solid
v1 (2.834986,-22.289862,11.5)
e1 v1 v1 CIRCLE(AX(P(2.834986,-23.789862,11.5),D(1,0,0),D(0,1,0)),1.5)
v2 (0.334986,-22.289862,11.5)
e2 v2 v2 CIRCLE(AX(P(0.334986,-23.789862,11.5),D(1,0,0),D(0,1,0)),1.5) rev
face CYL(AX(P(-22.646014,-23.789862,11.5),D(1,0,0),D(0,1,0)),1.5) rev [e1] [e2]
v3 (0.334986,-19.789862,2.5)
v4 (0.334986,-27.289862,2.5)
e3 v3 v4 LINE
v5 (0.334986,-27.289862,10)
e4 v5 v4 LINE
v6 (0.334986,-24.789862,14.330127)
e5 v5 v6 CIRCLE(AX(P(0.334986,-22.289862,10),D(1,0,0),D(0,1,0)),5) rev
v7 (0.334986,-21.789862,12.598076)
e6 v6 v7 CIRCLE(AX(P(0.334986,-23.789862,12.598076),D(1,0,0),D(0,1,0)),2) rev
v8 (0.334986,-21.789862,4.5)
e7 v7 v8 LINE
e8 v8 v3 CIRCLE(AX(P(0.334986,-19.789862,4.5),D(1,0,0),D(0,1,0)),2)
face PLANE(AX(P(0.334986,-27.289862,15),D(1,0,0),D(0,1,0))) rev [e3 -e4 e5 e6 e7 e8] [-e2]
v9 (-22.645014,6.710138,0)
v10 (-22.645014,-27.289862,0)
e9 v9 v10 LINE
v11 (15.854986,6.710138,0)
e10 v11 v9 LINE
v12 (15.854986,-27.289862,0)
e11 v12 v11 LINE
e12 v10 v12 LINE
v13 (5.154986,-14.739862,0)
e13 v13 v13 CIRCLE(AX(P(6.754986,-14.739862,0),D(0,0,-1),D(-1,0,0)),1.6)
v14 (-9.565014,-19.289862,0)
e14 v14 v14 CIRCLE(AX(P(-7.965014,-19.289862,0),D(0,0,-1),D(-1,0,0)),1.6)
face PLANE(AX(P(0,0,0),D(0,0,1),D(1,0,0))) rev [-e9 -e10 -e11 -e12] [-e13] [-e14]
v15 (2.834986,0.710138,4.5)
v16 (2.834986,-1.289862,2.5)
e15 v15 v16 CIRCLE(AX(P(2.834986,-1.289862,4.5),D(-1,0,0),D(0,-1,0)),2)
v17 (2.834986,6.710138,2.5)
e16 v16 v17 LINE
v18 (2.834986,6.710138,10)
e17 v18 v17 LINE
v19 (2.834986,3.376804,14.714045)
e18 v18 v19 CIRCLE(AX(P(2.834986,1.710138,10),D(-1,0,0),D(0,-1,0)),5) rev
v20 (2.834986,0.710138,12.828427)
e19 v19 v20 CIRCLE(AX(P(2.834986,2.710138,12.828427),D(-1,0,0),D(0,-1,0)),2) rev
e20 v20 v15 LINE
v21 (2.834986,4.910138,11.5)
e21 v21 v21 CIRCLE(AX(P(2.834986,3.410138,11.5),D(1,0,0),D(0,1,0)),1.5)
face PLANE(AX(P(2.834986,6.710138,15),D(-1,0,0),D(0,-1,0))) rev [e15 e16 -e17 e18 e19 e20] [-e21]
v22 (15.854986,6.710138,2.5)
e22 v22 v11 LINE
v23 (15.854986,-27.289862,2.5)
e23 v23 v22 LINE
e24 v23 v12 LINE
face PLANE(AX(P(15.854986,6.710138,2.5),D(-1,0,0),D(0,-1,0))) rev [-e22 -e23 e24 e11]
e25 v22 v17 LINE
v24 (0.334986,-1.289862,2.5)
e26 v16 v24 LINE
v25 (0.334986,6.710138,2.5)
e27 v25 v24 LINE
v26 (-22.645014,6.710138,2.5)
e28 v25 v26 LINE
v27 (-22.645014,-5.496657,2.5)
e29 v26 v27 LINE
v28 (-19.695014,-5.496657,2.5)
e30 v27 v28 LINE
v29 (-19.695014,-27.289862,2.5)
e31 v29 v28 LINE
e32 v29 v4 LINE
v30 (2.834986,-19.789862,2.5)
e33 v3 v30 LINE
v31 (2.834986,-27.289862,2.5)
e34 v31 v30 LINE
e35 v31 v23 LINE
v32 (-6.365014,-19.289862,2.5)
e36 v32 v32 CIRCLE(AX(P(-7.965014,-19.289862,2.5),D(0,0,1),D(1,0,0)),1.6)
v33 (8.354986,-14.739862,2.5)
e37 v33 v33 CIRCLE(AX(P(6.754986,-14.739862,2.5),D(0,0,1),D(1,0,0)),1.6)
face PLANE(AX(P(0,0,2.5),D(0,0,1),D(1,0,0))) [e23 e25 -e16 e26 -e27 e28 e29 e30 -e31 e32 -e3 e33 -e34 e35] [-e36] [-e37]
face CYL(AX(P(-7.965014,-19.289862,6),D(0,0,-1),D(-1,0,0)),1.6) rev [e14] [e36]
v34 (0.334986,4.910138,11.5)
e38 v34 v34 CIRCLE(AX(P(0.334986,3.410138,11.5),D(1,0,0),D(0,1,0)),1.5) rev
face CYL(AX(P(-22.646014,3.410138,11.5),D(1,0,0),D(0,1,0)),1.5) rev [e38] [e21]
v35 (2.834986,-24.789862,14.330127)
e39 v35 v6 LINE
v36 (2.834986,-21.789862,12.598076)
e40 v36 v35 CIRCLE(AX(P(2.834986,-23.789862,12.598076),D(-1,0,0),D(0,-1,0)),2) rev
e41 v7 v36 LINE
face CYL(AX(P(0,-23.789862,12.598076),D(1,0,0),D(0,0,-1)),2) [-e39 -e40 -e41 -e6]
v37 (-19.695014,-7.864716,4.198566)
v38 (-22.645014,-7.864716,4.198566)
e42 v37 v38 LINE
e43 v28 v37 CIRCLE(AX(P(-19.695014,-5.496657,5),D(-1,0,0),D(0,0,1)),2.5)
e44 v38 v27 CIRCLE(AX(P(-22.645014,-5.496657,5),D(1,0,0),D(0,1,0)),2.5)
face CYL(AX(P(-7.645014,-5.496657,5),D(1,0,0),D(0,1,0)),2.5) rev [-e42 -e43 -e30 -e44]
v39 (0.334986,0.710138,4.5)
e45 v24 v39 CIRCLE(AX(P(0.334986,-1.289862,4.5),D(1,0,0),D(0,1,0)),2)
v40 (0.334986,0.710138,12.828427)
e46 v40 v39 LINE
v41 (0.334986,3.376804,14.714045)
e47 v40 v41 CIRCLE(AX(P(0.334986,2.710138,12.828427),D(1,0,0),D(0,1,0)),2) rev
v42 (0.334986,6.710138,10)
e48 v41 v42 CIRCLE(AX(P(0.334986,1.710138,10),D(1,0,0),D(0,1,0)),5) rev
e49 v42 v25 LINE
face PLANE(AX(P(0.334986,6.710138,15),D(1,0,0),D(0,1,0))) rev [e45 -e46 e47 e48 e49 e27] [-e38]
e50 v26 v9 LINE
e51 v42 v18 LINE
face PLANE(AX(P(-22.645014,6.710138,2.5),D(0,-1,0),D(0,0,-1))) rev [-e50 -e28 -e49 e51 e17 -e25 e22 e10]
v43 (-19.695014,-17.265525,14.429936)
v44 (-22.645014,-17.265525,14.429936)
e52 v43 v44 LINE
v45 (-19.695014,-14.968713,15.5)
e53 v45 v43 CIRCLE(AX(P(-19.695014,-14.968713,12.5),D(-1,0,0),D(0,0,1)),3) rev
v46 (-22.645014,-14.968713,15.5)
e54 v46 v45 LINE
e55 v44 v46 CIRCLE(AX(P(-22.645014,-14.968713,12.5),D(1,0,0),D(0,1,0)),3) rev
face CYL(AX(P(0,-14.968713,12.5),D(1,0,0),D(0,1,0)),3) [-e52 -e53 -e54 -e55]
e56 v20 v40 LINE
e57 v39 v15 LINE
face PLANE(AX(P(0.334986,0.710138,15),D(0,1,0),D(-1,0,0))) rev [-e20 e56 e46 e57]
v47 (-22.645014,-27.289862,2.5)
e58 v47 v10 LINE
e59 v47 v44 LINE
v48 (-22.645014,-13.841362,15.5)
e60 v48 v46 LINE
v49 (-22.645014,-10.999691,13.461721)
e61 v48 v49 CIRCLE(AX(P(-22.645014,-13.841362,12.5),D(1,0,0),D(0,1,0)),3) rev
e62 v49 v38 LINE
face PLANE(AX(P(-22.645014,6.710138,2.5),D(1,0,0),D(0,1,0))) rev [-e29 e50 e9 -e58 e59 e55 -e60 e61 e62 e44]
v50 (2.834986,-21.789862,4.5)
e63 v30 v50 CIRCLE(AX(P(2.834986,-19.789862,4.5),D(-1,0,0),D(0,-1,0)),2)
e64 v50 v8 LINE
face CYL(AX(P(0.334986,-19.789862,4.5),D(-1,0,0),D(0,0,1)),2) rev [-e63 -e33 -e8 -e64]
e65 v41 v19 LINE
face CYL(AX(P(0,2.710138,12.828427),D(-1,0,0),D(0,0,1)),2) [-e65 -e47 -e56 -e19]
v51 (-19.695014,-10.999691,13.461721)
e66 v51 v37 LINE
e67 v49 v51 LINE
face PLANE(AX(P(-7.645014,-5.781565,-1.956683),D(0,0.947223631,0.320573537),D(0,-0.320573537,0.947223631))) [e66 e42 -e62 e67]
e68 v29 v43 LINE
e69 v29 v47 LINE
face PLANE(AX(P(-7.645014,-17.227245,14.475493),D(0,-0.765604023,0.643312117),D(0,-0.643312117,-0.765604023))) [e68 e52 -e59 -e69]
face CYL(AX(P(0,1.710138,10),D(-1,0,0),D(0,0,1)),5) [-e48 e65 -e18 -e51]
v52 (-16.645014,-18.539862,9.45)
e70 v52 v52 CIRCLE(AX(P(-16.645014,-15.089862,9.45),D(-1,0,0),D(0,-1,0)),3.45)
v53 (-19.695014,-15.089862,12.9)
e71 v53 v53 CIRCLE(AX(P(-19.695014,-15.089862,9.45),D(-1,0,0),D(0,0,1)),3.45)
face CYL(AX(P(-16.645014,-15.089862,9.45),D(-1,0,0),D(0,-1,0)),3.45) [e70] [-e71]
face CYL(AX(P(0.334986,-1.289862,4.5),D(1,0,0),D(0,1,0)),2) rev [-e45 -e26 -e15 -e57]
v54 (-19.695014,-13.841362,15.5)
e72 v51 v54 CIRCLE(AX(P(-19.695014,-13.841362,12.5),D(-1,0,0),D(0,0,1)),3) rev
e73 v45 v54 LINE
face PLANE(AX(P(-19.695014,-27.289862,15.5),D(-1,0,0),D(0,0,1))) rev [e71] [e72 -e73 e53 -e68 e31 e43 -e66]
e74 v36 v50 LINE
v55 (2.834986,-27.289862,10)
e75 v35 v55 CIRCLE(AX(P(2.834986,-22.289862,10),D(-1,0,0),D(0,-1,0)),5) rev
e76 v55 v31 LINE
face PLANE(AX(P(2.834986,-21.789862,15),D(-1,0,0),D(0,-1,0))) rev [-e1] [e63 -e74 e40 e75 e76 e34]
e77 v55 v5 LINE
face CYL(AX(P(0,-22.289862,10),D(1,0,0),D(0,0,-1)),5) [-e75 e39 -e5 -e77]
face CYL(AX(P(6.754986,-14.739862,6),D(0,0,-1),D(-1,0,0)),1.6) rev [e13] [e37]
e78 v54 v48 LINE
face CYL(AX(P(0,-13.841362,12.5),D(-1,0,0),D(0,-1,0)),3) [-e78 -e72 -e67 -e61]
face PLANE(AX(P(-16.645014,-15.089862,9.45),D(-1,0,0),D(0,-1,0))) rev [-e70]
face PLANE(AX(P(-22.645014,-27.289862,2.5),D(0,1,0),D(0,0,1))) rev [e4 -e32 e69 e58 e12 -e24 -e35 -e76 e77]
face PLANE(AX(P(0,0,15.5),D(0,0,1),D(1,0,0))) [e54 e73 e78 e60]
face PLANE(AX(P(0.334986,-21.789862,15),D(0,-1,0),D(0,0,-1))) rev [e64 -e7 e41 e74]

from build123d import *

# Parameters (mm, degrees)
ESBO_O1_W                = 38.5
ESBO_O1_H                = 34
RESSALTO_EXTRUS_O1_DEPTH = 2.5
ESBO_O2_W                = 2.5
ESBO_O2_H                = 6
ESBO_O2_H_2              = 5.5
RESSALTO_EXTRUS_O2_DEPTH = 12.5
CORTE_EXTRUS_O1_REACH    = 42.236
ESBO_O3_R                = 1.5
ESBO_O4_W                = 2.95
ESBO_O4_H                = 20
RESSALTO_EXTRUS_O3_DEPTH = 13
ESBO_O5_R                = 3.45
CORTE_EXTRUS_O2_DEPTH    = 15
FILETE1_R                = 3
FILETE2_R                = 2.5
ESBO_O7_R                = 3.45
RESSALTO_EXTRUS_O5_DEPTH = 6
ESBO_O8_R                = 1.6
CORTE_EXTRUS_O3_DEPTH    = 6
FILETE3_R                = 2
FILETE4_R                = 5
FILETE5_R                = 2


with BuildPart() as part:
    # Esboço1 → Ressalto-extrusão1 (new body)
    with BuildSketch(Plane.XY):
        with Locations((-3.395014232, -10.289862205)):
            Rectangle(ESBO_O1_W, ESBO_O1_H)
    extrude(amount=RESSALTO_EXTRUS_O1_DEPTH)

    # Esboço2 → Ressalto-extrusão2 (add)
    with BuildSketch(Plane.XY.offset(2.5)):
        with Locations((1.584985768, 3.710137795)):
            Rectangle(ESBO_O2_W, ESBO_O2_H)
        with Locations((1.584985768, -24.539862205)):
            Rectangle(ESBO_O2_W, ESBO_O2_H_2)
    extrude(amount=RESSALTO_EXTRUS_O2_DEPTH)

    # Esboço3 → Corte-extrusão1 (cut, up to next)
    with BuildSketch(Plane(origin=(2.834985768, 0, 0), x_dir=(0, 0, -1), z_dir=(1, 0, 0)), mode=Mode.PRIVATE) as corte_extrus_o1_sk1:
        with Locations(Location((-11.5, 3.410137795, 0), (0, 0, 90))):
            Circle(ESBO_O3_R)
    corte_extrus_o1_tool1 = extrude(corte_extrus_o1_sk1.sketch, amount=-CORTE_EXTRUS_O1_REACH, mode=Mode.PRIVATE) & part.part
    # Esboço3 → Corte-extrusão1 (cut, up to next)
    with BuildSketch(Plane(origin=(2.834985768, 0, 0), x_dir=(0, 0, -1), z_dir=(1, 0, 0)), mode=Mode.PRIVATE) as corte_extrus_o1_sk2:
        with Locations(Location((-11.5, -23.789862205, 0), (0, 0, 90))):
            Circle(ESBO_O3_R)
    corte_extrus_o1_tool2 = extrude(corte_extrus_o1_sk2.sketch, amount=-CORTE_EXTRUS_O1_REACH, mode=Mode.PRIVATE) & part.part
    add(corte_extrus_o1_tool1.solids().sort_by_distance((2.834986, 3.410138, 11.5))[0], mode=Mode.SUBTRACT)
    add(corte_extrus_o1_tool2.solids().sort_by_distance((2.834986, -23.789862, 11.5))[0], mode=Mode.SUBTRACT)

    # Esboço4 → Ressalto-extrusão3 (add)
    with BuildSketch(Plane.XY.offset(2.5)):
        with Locations((-21.170014232, -17.289862205)):
            Rectangle(ESBO_O4_W, ESBO_O4_H)
    extrude(amount=RESSALTO_EXTRUS_O3_DEPTH)

    # Esboço5 → Corte-extrusão2 (cut)
    with BuildSketch(Plane.ZY.offset(22.645014232)):
        Polygon((2.5, -7.289862205), (15.222036194, -11.595443281), (15.5, -11.689515935), (15.5, -7.289862205), align=None)
        Polygon((15.222036194, -16.59994967), (2.5, -27.289862205), (15.5, -27.289862205), (15.5, -16.36638574), align=None)
        with Locations(Location((9.45, -15.089862205, 0), (0, 0, 270))):
            Circle(ESBO_O5_R)
    extrude(amount=-CORTE_EXTRUS_O2_DEPTH, mode=Mode.SUBTRACT)

    # Filete1
    filete1_edges = [part.edges().sort_by_distance(p)[0] for p in [
        (-21.170014232, -11.689515935, 15.5),
        (-21.170014232, -16.36638574, 15.5),
    ]]
    fillet(filete1_edges, radius=FILETE1_R)

    # Filete2
    # the kernel refuses this fillet: 2.5 mm, written as the material it adds along each edge
    with BuildSketch(Plane(origin=(-19.695014232, -7.289862205, 2.5), x_dir=(0, -0.32057353707536407, 0.947223631106715), z_dir=(-1, 0, 0))) as filete2_piece_1:
        with BuildLine():
            CenterArc((FILETE2_R * 0.717282002488, FILETE2_R), FILETE2_R, 198.697613514, 71.302386486)
            Line((-FILETE2_R * 0.229941628618, FILETE2_R * 0.679426462925), (0, 0))
            Line((0, 0), (FILETE2_R * 0.717282002488, 0))
        make_face()
    extrude(amount=2.95)

    # Esboço7 → Ressalto-extrusão5 (add)
    with BuildSketch(Plane.ZY.offset(22.645014232)):
        with Locations(Location((9.45, -15.089862205, 0), (0, 0, 270))):
            Circle(ESBO_O7_R)
    extrude(amount=-RESSALTO_EXTRUS_O5_DEPTH)

    # Esboço8 → Corte-extrusão3 (cut)
    with BuildSketch(Plane(origin=(0, 0, 0), x_dir=(-1, 0, 0), z_dir=(0, 0, -1))):
        with Locations((7.965014232, -19.289862205)):
            Circle(ESBO_O8_R)
        with Locations((-6.754985768, -14.739862205)):
            Circle(ESBO_O8_R)
    extrude(amount=-CORTE_EXTRUS_O3_DEPTH, mode=Mode.SUBTRACT)

    # Filete3
    filete3_edges = [part.edges().sort_by_distance(p)[0] for p in [
        (1.584985768, -21.789862205, 2.5),
        (1.584985768, 0.710137795, 2.5),
    ]]
    fillet(filete3_edges, radius=FILETE3_R)

    # Filete4
    filete4_edges = [part.edges().sort_by_distance(p)[0] for p in [
        (1.584985768, -27.289862205, 15),
        (1.584985768, 6.710137795, 15),
    ]]
    fillet(filete4_edges, radius=FILETE4_R)

    # Filete5
    filete5_edges = [part.edges().sort_by_distance(p)[0] for p in [
        (1.584985768, 0.710137795, 15),
        (1.584985768, -21.789862205, 15),
    ]]
    fillet(filete5_edges, radius=FILETE5_R)


solid = part.part
